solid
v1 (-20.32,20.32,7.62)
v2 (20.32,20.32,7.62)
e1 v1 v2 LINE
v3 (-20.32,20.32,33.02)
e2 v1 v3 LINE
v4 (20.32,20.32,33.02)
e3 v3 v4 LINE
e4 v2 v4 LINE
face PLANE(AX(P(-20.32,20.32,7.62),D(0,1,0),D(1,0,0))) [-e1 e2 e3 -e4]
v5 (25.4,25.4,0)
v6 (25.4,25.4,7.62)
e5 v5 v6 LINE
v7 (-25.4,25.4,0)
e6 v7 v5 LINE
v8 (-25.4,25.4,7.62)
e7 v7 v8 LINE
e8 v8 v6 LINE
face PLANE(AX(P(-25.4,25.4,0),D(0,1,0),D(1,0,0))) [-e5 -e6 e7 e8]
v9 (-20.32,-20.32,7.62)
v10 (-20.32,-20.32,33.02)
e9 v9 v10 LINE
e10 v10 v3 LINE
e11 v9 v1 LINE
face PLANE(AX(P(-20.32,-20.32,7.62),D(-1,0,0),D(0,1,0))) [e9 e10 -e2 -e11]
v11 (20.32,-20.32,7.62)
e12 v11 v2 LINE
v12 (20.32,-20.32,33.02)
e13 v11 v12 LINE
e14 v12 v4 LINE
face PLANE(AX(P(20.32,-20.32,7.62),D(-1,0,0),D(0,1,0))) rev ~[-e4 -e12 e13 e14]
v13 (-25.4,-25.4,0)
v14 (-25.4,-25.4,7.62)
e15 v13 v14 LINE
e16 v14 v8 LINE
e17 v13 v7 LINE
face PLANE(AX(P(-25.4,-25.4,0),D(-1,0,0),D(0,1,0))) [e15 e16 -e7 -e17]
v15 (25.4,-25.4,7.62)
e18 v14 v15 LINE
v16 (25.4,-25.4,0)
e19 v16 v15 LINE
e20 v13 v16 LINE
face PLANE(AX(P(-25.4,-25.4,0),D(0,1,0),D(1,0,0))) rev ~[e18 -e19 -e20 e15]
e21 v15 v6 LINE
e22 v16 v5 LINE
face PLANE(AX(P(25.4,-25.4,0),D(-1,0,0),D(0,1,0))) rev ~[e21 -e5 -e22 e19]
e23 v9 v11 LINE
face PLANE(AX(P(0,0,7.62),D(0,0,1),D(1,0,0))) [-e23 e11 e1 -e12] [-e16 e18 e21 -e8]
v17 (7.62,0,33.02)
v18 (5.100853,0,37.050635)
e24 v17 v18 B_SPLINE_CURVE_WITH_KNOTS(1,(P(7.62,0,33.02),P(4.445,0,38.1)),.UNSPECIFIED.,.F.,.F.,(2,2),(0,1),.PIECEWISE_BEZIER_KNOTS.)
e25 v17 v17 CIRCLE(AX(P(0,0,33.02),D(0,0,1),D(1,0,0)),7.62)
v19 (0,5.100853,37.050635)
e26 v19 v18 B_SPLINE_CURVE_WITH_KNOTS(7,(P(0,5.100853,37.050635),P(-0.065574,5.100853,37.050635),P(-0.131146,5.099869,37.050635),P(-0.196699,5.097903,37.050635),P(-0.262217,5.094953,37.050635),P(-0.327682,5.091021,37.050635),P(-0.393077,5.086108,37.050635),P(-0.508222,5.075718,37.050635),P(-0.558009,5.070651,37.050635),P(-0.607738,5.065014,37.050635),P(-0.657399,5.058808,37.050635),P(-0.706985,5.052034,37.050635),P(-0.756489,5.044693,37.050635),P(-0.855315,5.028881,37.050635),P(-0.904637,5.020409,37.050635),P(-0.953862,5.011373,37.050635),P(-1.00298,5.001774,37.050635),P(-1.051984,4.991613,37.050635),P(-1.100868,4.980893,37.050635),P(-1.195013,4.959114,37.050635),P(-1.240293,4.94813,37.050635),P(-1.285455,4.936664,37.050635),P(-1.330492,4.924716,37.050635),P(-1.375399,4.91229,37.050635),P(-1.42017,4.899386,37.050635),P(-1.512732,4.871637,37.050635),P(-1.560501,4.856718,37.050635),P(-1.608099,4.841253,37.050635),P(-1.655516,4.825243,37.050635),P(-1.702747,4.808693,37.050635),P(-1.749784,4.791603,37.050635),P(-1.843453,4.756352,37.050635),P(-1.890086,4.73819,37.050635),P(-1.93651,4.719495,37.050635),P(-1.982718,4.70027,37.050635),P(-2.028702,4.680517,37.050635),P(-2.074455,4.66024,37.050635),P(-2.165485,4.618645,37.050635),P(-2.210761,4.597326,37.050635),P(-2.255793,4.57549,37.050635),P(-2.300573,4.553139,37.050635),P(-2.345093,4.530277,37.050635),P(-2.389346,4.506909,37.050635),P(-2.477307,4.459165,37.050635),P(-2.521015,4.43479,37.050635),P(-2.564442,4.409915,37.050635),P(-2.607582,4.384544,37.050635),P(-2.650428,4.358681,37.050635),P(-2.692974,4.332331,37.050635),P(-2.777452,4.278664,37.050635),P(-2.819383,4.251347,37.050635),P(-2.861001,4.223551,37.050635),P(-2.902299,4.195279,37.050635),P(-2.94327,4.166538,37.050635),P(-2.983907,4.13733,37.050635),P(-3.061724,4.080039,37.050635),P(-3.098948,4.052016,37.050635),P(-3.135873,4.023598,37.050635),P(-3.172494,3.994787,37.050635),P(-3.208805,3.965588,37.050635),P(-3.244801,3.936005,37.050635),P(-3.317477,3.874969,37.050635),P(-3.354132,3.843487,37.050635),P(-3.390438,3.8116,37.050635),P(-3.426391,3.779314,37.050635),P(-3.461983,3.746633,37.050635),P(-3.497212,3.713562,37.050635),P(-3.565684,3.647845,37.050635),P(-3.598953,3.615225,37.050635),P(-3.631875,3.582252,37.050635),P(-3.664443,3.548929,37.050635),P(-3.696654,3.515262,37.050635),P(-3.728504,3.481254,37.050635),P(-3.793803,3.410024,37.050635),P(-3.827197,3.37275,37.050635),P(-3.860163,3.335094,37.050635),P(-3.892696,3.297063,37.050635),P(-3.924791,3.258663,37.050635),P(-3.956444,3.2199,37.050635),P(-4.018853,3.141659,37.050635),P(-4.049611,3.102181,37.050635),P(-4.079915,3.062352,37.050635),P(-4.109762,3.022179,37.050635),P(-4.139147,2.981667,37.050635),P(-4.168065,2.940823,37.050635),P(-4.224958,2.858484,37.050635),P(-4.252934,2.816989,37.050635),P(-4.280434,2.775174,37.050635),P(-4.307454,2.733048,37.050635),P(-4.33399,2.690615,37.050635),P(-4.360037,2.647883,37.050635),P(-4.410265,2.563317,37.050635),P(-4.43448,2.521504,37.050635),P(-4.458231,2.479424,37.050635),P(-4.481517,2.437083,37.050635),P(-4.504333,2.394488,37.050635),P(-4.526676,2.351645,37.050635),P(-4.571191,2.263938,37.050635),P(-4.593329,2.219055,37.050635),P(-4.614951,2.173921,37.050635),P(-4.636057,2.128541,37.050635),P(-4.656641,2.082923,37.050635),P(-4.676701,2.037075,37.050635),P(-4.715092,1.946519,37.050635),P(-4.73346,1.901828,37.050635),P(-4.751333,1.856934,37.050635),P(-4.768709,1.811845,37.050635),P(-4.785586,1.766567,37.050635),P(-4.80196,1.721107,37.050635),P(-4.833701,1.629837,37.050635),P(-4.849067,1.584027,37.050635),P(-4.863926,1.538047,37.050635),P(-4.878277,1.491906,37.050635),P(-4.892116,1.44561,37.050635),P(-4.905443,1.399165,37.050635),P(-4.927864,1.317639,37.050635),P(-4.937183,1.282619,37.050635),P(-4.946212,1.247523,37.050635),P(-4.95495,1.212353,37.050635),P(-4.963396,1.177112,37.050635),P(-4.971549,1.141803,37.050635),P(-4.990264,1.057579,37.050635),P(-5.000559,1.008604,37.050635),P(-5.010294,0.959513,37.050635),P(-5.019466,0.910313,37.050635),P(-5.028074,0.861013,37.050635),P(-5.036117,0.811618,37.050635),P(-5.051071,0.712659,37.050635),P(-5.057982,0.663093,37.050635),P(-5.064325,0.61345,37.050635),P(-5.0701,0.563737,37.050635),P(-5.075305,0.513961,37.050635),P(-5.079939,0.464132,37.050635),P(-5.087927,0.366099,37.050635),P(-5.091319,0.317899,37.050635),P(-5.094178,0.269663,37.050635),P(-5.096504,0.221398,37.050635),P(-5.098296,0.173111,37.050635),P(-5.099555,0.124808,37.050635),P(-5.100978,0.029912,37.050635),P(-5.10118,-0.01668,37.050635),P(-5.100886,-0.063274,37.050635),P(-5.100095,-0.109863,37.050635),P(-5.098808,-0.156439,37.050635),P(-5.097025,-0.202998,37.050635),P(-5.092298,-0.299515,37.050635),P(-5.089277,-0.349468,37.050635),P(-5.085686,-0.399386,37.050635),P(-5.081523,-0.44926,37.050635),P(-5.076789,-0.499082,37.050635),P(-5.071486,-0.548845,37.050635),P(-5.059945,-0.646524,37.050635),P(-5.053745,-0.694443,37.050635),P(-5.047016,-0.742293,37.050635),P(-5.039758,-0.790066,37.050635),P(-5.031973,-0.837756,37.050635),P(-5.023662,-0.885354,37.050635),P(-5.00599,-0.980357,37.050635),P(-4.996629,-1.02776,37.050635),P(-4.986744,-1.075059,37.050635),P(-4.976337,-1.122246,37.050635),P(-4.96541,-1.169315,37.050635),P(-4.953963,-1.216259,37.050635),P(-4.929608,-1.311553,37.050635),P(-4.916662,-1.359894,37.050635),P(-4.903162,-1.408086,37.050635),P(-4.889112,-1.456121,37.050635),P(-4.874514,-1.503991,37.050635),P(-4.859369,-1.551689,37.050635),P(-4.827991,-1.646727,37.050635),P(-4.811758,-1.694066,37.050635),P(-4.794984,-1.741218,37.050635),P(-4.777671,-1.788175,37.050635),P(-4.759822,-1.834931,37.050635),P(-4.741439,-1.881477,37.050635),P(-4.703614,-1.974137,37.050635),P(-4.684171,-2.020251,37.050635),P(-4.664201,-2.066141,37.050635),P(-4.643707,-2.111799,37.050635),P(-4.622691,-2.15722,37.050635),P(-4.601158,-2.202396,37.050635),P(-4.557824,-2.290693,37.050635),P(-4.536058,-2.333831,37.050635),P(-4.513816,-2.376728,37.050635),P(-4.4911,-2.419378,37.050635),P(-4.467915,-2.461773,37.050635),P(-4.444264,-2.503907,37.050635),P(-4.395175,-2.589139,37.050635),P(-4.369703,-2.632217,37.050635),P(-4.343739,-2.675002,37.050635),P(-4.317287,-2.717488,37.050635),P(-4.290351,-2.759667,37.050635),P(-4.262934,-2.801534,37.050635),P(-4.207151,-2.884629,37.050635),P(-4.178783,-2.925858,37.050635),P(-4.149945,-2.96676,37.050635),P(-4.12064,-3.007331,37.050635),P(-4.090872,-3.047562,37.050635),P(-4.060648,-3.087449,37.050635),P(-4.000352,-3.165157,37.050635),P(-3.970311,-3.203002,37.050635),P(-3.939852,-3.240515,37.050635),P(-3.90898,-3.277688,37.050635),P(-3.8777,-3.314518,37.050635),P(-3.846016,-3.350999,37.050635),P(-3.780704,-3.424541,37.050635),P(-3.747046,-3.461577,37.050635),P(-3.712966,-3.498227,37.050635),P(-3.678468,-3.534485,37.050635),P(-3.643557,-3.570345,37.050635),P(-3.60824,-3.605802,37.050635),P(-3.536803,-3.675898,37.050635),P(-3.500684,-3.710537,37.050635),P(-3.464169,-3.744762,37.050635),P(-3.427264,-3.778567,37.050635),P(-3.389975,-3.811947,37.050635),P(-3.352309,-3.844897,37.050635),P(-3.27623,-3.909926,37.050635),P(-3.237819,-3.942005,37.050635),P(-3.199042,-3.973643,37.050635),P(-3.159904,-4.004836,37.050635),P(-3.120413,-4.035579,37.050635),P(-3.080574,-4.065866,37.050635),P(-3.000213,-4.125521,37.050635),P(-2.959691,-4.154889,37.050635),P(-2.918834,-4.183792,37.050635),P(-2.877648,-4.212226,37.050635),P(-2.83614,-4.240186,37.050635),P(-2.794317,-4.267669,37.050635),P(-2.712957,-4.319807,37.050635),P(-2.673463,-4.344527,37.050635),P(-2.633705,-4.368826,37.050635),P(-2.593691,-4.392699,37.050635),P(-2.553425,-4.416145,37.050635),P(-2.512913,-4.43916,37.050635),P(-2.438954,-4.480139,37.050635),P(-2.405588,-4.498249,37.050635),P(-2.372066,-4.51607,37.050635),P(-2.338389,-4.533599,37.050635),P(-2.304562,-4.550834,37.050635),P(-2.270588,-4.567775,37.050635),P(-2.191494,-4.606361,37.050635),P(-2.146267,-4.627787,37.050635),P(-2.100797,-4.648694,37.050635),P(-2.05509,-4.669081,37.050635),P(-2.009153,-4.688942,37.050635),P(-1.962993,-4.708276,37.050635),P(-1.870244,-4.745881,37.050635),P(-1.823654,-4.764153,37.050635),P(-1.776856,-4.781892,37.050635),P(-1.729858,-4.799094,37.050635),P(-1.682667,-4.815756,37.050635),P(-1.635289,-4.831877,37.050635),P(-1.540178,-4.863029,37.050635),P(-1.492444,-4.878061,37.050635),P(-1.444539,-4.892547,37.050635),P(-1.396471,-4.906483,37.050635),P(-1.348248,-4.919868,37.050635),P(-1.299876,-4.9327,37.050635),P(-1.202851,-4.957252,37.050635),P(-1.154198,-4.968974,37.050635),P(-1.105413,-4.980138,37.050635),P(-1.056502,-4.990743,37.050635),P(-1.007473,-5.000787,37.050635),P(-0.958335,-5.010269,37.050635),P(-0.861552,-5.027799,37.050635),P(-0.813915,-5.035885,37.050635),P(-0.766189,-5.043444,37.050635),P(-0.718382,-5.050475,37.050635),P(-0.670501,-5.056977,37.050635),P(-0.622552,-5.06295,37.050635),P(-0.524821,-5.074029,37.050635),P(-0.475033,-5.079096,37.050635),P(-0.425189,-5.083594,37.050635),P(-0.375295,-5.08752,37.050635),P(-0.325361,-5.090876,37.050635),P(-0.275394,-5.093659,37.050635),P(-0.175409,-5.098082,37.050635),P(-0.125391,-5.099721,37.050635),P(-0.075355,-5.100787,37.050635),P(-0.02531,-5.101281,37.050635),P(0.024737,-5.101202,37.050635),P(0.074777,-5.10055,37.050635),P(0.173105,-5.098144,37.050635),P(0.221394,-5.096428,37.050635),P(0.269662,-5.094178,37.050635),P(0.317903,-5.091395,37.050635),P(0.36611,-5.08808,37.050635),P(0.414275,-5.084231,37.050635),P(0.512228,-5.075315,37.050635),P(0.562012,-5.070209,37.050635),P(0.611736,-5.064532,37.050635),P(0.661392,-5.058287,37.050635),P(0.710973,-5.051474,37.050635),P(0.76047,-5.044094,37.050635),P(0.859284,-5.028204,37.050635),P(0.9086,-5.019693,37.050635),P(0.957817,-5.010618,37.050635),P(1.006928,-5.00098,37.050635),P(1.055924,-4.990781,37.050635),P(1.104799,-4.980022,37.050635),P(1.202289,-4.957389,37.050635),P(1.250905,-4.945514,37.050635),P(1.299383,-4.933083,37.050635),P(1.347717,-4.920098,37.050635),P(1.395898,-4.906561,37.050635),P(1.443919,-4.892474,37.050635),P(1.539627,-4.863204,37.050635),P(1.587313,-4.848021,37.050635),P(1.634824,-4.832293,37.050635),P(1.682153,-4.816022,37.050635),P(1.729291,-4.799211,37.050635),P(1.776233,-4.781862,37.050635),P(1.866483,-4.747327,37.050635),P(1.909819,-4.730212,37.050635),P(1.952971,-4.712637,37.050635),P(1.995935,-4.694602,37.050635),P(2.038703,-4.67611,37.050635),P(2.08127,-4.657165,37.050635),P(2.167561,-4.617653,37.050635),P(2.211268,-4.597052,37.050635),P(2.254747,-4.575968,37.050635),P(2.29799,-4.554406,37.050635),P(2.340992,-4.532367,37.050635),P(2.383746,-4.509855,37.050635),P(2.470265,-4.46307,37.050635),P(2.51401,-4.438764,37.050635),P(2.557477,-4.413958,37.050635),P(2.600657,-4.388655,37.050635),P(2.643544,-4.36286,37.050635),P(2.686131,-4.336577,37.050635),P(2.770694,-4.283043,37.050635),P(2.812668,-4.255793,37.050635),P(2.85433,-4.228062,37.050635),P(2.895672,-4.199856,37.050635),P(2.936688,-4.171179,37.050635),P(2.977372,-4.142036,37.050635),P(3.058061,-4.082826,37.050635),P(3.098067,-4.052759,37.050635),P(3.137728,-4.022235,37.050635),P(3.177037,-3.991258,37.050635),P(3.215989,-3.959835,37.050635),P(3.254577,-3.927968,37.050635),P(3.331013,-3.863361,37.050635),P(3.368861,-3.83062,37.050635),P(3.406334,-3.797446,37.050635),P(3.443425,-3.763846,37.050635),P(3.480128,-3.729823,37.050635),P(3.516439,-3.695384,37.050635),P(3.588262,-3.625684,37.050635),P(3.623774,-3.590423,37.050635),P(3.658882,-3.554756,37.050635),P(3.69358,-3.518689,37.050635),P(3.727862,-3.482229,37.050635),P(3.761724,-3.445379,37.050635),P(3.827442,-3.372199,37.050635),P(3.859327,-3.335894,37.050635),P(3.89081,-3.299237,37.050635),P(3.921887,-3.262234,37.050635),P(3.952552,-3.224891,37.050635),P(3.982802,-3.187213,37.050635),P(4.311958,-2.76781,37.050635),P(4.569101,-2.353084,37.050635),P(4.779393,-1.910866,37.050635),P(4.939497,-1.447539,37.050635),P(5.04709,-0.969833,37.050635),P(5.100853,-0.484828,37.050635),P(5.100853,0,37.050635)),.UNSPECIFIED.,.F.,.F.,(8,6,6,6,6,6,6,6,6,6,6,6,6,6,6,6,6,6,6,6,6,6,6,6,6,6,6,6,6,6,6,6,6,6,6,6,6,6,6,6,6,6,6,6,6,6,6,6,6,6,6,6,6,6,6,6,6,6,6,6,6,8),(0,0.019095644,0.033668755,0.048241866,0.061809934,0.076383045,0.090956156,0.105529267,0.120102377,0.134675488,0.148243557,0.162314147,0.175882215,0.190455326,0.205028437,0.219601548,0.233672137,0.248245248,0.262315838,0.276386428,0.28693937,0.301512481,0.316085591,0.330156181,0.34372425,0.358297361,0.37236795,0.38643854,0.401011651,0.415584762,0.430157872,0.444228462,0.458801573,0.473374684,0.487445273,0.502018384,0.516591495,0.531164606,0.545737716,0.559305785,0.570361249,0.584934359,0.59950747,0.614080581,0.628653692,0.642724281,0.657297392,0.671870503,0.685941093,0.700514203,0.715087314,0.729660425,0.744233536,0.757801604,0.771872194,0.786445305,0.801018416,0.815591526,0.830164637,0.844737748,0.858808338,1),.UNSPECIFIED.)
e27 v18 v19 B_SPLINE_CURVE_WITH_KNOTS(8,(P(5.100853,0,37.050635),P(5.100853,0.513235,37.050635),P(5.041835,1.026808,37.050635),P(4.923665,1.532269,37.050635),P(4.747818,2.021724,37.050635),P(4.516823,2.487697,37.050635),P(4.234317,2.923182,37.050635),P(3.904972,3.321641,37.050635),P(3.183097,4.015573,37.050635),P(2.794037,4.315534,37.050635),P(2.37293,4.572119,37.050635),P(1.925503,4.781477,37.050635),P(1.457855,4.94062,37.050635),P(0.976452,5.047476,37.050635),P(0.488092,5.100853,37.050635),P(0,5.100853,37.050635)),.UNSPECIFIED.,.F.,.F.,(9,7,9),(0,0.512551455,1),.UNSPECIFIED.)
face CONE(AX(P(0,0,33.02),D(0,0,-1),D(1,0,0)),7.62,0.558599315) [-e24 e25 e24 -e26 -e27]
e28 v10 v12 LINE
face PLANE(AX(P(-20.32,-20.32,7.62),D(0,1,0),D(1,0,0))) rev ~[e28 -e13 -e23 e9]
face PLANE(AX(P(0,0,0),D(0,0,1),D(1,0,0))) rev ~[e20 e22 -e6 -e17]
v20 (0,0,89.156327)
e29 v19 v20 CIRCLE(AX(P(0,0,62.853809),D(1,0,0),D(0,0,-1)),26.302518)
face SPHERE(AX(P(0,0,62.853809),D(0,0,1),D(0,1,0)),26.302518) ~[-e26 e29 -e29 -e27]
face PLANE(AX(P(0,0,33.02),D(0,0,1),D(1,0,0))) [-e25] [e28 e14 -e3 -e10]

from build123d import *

# Parameters (mm, degrees)
F0_W     = 50.8
F0_H     = 50.8
F1_DEPTH = 7.62
F2_W     = 40.64
F2_H     = 40.64
F3_DEPTH = 25.4
F4_R     = 7.62
F6_R     = 4.445


with BuildPart() as f1:
    # F0 (on Top) → F1 (new body)
    with BuildSketch(Plane.XY):
        Rectangle(F0_W, F0_H)
    extrude(amount=F1_DEPTH)

    # F2 (on face) → F3 (join)
    with BuildSketch(Plane.XY.offset(7.62)):
        Rectangle(F2_W, F2_H)
    extrude(amount=F3_DEPTH)

    # F4 (on face) → F7 section 0
    with BuildSketch(Plane.XY.offset(33.02)):
        Circle(F4_R)
    # F6 (on offset) → F7 section 1
    with BuildSketch(Plane.XY.offset(38.1)):
        Circle(F6_R)
    loft()

    # F9 (on offset) → F10 (revolve)
    with BuildSketch(Plane.YZ):
        with BuildLine():
            Line((0, 37.4538087019), (0, 36.551290824))
            ThreePointArc((0, 36.551290824), (26.302517878, 62.8538087019), (0, 89.1563265799))
            Line((0, 89.1563265799), (0, 88.2538087019))
            Line((0, 88.2538087019), (0, 37.4538087019))
        make_face()
    revolve(axis=Axis((0, 0, 62.8538087019), (0, 0, -1)))


solid = f1.part
